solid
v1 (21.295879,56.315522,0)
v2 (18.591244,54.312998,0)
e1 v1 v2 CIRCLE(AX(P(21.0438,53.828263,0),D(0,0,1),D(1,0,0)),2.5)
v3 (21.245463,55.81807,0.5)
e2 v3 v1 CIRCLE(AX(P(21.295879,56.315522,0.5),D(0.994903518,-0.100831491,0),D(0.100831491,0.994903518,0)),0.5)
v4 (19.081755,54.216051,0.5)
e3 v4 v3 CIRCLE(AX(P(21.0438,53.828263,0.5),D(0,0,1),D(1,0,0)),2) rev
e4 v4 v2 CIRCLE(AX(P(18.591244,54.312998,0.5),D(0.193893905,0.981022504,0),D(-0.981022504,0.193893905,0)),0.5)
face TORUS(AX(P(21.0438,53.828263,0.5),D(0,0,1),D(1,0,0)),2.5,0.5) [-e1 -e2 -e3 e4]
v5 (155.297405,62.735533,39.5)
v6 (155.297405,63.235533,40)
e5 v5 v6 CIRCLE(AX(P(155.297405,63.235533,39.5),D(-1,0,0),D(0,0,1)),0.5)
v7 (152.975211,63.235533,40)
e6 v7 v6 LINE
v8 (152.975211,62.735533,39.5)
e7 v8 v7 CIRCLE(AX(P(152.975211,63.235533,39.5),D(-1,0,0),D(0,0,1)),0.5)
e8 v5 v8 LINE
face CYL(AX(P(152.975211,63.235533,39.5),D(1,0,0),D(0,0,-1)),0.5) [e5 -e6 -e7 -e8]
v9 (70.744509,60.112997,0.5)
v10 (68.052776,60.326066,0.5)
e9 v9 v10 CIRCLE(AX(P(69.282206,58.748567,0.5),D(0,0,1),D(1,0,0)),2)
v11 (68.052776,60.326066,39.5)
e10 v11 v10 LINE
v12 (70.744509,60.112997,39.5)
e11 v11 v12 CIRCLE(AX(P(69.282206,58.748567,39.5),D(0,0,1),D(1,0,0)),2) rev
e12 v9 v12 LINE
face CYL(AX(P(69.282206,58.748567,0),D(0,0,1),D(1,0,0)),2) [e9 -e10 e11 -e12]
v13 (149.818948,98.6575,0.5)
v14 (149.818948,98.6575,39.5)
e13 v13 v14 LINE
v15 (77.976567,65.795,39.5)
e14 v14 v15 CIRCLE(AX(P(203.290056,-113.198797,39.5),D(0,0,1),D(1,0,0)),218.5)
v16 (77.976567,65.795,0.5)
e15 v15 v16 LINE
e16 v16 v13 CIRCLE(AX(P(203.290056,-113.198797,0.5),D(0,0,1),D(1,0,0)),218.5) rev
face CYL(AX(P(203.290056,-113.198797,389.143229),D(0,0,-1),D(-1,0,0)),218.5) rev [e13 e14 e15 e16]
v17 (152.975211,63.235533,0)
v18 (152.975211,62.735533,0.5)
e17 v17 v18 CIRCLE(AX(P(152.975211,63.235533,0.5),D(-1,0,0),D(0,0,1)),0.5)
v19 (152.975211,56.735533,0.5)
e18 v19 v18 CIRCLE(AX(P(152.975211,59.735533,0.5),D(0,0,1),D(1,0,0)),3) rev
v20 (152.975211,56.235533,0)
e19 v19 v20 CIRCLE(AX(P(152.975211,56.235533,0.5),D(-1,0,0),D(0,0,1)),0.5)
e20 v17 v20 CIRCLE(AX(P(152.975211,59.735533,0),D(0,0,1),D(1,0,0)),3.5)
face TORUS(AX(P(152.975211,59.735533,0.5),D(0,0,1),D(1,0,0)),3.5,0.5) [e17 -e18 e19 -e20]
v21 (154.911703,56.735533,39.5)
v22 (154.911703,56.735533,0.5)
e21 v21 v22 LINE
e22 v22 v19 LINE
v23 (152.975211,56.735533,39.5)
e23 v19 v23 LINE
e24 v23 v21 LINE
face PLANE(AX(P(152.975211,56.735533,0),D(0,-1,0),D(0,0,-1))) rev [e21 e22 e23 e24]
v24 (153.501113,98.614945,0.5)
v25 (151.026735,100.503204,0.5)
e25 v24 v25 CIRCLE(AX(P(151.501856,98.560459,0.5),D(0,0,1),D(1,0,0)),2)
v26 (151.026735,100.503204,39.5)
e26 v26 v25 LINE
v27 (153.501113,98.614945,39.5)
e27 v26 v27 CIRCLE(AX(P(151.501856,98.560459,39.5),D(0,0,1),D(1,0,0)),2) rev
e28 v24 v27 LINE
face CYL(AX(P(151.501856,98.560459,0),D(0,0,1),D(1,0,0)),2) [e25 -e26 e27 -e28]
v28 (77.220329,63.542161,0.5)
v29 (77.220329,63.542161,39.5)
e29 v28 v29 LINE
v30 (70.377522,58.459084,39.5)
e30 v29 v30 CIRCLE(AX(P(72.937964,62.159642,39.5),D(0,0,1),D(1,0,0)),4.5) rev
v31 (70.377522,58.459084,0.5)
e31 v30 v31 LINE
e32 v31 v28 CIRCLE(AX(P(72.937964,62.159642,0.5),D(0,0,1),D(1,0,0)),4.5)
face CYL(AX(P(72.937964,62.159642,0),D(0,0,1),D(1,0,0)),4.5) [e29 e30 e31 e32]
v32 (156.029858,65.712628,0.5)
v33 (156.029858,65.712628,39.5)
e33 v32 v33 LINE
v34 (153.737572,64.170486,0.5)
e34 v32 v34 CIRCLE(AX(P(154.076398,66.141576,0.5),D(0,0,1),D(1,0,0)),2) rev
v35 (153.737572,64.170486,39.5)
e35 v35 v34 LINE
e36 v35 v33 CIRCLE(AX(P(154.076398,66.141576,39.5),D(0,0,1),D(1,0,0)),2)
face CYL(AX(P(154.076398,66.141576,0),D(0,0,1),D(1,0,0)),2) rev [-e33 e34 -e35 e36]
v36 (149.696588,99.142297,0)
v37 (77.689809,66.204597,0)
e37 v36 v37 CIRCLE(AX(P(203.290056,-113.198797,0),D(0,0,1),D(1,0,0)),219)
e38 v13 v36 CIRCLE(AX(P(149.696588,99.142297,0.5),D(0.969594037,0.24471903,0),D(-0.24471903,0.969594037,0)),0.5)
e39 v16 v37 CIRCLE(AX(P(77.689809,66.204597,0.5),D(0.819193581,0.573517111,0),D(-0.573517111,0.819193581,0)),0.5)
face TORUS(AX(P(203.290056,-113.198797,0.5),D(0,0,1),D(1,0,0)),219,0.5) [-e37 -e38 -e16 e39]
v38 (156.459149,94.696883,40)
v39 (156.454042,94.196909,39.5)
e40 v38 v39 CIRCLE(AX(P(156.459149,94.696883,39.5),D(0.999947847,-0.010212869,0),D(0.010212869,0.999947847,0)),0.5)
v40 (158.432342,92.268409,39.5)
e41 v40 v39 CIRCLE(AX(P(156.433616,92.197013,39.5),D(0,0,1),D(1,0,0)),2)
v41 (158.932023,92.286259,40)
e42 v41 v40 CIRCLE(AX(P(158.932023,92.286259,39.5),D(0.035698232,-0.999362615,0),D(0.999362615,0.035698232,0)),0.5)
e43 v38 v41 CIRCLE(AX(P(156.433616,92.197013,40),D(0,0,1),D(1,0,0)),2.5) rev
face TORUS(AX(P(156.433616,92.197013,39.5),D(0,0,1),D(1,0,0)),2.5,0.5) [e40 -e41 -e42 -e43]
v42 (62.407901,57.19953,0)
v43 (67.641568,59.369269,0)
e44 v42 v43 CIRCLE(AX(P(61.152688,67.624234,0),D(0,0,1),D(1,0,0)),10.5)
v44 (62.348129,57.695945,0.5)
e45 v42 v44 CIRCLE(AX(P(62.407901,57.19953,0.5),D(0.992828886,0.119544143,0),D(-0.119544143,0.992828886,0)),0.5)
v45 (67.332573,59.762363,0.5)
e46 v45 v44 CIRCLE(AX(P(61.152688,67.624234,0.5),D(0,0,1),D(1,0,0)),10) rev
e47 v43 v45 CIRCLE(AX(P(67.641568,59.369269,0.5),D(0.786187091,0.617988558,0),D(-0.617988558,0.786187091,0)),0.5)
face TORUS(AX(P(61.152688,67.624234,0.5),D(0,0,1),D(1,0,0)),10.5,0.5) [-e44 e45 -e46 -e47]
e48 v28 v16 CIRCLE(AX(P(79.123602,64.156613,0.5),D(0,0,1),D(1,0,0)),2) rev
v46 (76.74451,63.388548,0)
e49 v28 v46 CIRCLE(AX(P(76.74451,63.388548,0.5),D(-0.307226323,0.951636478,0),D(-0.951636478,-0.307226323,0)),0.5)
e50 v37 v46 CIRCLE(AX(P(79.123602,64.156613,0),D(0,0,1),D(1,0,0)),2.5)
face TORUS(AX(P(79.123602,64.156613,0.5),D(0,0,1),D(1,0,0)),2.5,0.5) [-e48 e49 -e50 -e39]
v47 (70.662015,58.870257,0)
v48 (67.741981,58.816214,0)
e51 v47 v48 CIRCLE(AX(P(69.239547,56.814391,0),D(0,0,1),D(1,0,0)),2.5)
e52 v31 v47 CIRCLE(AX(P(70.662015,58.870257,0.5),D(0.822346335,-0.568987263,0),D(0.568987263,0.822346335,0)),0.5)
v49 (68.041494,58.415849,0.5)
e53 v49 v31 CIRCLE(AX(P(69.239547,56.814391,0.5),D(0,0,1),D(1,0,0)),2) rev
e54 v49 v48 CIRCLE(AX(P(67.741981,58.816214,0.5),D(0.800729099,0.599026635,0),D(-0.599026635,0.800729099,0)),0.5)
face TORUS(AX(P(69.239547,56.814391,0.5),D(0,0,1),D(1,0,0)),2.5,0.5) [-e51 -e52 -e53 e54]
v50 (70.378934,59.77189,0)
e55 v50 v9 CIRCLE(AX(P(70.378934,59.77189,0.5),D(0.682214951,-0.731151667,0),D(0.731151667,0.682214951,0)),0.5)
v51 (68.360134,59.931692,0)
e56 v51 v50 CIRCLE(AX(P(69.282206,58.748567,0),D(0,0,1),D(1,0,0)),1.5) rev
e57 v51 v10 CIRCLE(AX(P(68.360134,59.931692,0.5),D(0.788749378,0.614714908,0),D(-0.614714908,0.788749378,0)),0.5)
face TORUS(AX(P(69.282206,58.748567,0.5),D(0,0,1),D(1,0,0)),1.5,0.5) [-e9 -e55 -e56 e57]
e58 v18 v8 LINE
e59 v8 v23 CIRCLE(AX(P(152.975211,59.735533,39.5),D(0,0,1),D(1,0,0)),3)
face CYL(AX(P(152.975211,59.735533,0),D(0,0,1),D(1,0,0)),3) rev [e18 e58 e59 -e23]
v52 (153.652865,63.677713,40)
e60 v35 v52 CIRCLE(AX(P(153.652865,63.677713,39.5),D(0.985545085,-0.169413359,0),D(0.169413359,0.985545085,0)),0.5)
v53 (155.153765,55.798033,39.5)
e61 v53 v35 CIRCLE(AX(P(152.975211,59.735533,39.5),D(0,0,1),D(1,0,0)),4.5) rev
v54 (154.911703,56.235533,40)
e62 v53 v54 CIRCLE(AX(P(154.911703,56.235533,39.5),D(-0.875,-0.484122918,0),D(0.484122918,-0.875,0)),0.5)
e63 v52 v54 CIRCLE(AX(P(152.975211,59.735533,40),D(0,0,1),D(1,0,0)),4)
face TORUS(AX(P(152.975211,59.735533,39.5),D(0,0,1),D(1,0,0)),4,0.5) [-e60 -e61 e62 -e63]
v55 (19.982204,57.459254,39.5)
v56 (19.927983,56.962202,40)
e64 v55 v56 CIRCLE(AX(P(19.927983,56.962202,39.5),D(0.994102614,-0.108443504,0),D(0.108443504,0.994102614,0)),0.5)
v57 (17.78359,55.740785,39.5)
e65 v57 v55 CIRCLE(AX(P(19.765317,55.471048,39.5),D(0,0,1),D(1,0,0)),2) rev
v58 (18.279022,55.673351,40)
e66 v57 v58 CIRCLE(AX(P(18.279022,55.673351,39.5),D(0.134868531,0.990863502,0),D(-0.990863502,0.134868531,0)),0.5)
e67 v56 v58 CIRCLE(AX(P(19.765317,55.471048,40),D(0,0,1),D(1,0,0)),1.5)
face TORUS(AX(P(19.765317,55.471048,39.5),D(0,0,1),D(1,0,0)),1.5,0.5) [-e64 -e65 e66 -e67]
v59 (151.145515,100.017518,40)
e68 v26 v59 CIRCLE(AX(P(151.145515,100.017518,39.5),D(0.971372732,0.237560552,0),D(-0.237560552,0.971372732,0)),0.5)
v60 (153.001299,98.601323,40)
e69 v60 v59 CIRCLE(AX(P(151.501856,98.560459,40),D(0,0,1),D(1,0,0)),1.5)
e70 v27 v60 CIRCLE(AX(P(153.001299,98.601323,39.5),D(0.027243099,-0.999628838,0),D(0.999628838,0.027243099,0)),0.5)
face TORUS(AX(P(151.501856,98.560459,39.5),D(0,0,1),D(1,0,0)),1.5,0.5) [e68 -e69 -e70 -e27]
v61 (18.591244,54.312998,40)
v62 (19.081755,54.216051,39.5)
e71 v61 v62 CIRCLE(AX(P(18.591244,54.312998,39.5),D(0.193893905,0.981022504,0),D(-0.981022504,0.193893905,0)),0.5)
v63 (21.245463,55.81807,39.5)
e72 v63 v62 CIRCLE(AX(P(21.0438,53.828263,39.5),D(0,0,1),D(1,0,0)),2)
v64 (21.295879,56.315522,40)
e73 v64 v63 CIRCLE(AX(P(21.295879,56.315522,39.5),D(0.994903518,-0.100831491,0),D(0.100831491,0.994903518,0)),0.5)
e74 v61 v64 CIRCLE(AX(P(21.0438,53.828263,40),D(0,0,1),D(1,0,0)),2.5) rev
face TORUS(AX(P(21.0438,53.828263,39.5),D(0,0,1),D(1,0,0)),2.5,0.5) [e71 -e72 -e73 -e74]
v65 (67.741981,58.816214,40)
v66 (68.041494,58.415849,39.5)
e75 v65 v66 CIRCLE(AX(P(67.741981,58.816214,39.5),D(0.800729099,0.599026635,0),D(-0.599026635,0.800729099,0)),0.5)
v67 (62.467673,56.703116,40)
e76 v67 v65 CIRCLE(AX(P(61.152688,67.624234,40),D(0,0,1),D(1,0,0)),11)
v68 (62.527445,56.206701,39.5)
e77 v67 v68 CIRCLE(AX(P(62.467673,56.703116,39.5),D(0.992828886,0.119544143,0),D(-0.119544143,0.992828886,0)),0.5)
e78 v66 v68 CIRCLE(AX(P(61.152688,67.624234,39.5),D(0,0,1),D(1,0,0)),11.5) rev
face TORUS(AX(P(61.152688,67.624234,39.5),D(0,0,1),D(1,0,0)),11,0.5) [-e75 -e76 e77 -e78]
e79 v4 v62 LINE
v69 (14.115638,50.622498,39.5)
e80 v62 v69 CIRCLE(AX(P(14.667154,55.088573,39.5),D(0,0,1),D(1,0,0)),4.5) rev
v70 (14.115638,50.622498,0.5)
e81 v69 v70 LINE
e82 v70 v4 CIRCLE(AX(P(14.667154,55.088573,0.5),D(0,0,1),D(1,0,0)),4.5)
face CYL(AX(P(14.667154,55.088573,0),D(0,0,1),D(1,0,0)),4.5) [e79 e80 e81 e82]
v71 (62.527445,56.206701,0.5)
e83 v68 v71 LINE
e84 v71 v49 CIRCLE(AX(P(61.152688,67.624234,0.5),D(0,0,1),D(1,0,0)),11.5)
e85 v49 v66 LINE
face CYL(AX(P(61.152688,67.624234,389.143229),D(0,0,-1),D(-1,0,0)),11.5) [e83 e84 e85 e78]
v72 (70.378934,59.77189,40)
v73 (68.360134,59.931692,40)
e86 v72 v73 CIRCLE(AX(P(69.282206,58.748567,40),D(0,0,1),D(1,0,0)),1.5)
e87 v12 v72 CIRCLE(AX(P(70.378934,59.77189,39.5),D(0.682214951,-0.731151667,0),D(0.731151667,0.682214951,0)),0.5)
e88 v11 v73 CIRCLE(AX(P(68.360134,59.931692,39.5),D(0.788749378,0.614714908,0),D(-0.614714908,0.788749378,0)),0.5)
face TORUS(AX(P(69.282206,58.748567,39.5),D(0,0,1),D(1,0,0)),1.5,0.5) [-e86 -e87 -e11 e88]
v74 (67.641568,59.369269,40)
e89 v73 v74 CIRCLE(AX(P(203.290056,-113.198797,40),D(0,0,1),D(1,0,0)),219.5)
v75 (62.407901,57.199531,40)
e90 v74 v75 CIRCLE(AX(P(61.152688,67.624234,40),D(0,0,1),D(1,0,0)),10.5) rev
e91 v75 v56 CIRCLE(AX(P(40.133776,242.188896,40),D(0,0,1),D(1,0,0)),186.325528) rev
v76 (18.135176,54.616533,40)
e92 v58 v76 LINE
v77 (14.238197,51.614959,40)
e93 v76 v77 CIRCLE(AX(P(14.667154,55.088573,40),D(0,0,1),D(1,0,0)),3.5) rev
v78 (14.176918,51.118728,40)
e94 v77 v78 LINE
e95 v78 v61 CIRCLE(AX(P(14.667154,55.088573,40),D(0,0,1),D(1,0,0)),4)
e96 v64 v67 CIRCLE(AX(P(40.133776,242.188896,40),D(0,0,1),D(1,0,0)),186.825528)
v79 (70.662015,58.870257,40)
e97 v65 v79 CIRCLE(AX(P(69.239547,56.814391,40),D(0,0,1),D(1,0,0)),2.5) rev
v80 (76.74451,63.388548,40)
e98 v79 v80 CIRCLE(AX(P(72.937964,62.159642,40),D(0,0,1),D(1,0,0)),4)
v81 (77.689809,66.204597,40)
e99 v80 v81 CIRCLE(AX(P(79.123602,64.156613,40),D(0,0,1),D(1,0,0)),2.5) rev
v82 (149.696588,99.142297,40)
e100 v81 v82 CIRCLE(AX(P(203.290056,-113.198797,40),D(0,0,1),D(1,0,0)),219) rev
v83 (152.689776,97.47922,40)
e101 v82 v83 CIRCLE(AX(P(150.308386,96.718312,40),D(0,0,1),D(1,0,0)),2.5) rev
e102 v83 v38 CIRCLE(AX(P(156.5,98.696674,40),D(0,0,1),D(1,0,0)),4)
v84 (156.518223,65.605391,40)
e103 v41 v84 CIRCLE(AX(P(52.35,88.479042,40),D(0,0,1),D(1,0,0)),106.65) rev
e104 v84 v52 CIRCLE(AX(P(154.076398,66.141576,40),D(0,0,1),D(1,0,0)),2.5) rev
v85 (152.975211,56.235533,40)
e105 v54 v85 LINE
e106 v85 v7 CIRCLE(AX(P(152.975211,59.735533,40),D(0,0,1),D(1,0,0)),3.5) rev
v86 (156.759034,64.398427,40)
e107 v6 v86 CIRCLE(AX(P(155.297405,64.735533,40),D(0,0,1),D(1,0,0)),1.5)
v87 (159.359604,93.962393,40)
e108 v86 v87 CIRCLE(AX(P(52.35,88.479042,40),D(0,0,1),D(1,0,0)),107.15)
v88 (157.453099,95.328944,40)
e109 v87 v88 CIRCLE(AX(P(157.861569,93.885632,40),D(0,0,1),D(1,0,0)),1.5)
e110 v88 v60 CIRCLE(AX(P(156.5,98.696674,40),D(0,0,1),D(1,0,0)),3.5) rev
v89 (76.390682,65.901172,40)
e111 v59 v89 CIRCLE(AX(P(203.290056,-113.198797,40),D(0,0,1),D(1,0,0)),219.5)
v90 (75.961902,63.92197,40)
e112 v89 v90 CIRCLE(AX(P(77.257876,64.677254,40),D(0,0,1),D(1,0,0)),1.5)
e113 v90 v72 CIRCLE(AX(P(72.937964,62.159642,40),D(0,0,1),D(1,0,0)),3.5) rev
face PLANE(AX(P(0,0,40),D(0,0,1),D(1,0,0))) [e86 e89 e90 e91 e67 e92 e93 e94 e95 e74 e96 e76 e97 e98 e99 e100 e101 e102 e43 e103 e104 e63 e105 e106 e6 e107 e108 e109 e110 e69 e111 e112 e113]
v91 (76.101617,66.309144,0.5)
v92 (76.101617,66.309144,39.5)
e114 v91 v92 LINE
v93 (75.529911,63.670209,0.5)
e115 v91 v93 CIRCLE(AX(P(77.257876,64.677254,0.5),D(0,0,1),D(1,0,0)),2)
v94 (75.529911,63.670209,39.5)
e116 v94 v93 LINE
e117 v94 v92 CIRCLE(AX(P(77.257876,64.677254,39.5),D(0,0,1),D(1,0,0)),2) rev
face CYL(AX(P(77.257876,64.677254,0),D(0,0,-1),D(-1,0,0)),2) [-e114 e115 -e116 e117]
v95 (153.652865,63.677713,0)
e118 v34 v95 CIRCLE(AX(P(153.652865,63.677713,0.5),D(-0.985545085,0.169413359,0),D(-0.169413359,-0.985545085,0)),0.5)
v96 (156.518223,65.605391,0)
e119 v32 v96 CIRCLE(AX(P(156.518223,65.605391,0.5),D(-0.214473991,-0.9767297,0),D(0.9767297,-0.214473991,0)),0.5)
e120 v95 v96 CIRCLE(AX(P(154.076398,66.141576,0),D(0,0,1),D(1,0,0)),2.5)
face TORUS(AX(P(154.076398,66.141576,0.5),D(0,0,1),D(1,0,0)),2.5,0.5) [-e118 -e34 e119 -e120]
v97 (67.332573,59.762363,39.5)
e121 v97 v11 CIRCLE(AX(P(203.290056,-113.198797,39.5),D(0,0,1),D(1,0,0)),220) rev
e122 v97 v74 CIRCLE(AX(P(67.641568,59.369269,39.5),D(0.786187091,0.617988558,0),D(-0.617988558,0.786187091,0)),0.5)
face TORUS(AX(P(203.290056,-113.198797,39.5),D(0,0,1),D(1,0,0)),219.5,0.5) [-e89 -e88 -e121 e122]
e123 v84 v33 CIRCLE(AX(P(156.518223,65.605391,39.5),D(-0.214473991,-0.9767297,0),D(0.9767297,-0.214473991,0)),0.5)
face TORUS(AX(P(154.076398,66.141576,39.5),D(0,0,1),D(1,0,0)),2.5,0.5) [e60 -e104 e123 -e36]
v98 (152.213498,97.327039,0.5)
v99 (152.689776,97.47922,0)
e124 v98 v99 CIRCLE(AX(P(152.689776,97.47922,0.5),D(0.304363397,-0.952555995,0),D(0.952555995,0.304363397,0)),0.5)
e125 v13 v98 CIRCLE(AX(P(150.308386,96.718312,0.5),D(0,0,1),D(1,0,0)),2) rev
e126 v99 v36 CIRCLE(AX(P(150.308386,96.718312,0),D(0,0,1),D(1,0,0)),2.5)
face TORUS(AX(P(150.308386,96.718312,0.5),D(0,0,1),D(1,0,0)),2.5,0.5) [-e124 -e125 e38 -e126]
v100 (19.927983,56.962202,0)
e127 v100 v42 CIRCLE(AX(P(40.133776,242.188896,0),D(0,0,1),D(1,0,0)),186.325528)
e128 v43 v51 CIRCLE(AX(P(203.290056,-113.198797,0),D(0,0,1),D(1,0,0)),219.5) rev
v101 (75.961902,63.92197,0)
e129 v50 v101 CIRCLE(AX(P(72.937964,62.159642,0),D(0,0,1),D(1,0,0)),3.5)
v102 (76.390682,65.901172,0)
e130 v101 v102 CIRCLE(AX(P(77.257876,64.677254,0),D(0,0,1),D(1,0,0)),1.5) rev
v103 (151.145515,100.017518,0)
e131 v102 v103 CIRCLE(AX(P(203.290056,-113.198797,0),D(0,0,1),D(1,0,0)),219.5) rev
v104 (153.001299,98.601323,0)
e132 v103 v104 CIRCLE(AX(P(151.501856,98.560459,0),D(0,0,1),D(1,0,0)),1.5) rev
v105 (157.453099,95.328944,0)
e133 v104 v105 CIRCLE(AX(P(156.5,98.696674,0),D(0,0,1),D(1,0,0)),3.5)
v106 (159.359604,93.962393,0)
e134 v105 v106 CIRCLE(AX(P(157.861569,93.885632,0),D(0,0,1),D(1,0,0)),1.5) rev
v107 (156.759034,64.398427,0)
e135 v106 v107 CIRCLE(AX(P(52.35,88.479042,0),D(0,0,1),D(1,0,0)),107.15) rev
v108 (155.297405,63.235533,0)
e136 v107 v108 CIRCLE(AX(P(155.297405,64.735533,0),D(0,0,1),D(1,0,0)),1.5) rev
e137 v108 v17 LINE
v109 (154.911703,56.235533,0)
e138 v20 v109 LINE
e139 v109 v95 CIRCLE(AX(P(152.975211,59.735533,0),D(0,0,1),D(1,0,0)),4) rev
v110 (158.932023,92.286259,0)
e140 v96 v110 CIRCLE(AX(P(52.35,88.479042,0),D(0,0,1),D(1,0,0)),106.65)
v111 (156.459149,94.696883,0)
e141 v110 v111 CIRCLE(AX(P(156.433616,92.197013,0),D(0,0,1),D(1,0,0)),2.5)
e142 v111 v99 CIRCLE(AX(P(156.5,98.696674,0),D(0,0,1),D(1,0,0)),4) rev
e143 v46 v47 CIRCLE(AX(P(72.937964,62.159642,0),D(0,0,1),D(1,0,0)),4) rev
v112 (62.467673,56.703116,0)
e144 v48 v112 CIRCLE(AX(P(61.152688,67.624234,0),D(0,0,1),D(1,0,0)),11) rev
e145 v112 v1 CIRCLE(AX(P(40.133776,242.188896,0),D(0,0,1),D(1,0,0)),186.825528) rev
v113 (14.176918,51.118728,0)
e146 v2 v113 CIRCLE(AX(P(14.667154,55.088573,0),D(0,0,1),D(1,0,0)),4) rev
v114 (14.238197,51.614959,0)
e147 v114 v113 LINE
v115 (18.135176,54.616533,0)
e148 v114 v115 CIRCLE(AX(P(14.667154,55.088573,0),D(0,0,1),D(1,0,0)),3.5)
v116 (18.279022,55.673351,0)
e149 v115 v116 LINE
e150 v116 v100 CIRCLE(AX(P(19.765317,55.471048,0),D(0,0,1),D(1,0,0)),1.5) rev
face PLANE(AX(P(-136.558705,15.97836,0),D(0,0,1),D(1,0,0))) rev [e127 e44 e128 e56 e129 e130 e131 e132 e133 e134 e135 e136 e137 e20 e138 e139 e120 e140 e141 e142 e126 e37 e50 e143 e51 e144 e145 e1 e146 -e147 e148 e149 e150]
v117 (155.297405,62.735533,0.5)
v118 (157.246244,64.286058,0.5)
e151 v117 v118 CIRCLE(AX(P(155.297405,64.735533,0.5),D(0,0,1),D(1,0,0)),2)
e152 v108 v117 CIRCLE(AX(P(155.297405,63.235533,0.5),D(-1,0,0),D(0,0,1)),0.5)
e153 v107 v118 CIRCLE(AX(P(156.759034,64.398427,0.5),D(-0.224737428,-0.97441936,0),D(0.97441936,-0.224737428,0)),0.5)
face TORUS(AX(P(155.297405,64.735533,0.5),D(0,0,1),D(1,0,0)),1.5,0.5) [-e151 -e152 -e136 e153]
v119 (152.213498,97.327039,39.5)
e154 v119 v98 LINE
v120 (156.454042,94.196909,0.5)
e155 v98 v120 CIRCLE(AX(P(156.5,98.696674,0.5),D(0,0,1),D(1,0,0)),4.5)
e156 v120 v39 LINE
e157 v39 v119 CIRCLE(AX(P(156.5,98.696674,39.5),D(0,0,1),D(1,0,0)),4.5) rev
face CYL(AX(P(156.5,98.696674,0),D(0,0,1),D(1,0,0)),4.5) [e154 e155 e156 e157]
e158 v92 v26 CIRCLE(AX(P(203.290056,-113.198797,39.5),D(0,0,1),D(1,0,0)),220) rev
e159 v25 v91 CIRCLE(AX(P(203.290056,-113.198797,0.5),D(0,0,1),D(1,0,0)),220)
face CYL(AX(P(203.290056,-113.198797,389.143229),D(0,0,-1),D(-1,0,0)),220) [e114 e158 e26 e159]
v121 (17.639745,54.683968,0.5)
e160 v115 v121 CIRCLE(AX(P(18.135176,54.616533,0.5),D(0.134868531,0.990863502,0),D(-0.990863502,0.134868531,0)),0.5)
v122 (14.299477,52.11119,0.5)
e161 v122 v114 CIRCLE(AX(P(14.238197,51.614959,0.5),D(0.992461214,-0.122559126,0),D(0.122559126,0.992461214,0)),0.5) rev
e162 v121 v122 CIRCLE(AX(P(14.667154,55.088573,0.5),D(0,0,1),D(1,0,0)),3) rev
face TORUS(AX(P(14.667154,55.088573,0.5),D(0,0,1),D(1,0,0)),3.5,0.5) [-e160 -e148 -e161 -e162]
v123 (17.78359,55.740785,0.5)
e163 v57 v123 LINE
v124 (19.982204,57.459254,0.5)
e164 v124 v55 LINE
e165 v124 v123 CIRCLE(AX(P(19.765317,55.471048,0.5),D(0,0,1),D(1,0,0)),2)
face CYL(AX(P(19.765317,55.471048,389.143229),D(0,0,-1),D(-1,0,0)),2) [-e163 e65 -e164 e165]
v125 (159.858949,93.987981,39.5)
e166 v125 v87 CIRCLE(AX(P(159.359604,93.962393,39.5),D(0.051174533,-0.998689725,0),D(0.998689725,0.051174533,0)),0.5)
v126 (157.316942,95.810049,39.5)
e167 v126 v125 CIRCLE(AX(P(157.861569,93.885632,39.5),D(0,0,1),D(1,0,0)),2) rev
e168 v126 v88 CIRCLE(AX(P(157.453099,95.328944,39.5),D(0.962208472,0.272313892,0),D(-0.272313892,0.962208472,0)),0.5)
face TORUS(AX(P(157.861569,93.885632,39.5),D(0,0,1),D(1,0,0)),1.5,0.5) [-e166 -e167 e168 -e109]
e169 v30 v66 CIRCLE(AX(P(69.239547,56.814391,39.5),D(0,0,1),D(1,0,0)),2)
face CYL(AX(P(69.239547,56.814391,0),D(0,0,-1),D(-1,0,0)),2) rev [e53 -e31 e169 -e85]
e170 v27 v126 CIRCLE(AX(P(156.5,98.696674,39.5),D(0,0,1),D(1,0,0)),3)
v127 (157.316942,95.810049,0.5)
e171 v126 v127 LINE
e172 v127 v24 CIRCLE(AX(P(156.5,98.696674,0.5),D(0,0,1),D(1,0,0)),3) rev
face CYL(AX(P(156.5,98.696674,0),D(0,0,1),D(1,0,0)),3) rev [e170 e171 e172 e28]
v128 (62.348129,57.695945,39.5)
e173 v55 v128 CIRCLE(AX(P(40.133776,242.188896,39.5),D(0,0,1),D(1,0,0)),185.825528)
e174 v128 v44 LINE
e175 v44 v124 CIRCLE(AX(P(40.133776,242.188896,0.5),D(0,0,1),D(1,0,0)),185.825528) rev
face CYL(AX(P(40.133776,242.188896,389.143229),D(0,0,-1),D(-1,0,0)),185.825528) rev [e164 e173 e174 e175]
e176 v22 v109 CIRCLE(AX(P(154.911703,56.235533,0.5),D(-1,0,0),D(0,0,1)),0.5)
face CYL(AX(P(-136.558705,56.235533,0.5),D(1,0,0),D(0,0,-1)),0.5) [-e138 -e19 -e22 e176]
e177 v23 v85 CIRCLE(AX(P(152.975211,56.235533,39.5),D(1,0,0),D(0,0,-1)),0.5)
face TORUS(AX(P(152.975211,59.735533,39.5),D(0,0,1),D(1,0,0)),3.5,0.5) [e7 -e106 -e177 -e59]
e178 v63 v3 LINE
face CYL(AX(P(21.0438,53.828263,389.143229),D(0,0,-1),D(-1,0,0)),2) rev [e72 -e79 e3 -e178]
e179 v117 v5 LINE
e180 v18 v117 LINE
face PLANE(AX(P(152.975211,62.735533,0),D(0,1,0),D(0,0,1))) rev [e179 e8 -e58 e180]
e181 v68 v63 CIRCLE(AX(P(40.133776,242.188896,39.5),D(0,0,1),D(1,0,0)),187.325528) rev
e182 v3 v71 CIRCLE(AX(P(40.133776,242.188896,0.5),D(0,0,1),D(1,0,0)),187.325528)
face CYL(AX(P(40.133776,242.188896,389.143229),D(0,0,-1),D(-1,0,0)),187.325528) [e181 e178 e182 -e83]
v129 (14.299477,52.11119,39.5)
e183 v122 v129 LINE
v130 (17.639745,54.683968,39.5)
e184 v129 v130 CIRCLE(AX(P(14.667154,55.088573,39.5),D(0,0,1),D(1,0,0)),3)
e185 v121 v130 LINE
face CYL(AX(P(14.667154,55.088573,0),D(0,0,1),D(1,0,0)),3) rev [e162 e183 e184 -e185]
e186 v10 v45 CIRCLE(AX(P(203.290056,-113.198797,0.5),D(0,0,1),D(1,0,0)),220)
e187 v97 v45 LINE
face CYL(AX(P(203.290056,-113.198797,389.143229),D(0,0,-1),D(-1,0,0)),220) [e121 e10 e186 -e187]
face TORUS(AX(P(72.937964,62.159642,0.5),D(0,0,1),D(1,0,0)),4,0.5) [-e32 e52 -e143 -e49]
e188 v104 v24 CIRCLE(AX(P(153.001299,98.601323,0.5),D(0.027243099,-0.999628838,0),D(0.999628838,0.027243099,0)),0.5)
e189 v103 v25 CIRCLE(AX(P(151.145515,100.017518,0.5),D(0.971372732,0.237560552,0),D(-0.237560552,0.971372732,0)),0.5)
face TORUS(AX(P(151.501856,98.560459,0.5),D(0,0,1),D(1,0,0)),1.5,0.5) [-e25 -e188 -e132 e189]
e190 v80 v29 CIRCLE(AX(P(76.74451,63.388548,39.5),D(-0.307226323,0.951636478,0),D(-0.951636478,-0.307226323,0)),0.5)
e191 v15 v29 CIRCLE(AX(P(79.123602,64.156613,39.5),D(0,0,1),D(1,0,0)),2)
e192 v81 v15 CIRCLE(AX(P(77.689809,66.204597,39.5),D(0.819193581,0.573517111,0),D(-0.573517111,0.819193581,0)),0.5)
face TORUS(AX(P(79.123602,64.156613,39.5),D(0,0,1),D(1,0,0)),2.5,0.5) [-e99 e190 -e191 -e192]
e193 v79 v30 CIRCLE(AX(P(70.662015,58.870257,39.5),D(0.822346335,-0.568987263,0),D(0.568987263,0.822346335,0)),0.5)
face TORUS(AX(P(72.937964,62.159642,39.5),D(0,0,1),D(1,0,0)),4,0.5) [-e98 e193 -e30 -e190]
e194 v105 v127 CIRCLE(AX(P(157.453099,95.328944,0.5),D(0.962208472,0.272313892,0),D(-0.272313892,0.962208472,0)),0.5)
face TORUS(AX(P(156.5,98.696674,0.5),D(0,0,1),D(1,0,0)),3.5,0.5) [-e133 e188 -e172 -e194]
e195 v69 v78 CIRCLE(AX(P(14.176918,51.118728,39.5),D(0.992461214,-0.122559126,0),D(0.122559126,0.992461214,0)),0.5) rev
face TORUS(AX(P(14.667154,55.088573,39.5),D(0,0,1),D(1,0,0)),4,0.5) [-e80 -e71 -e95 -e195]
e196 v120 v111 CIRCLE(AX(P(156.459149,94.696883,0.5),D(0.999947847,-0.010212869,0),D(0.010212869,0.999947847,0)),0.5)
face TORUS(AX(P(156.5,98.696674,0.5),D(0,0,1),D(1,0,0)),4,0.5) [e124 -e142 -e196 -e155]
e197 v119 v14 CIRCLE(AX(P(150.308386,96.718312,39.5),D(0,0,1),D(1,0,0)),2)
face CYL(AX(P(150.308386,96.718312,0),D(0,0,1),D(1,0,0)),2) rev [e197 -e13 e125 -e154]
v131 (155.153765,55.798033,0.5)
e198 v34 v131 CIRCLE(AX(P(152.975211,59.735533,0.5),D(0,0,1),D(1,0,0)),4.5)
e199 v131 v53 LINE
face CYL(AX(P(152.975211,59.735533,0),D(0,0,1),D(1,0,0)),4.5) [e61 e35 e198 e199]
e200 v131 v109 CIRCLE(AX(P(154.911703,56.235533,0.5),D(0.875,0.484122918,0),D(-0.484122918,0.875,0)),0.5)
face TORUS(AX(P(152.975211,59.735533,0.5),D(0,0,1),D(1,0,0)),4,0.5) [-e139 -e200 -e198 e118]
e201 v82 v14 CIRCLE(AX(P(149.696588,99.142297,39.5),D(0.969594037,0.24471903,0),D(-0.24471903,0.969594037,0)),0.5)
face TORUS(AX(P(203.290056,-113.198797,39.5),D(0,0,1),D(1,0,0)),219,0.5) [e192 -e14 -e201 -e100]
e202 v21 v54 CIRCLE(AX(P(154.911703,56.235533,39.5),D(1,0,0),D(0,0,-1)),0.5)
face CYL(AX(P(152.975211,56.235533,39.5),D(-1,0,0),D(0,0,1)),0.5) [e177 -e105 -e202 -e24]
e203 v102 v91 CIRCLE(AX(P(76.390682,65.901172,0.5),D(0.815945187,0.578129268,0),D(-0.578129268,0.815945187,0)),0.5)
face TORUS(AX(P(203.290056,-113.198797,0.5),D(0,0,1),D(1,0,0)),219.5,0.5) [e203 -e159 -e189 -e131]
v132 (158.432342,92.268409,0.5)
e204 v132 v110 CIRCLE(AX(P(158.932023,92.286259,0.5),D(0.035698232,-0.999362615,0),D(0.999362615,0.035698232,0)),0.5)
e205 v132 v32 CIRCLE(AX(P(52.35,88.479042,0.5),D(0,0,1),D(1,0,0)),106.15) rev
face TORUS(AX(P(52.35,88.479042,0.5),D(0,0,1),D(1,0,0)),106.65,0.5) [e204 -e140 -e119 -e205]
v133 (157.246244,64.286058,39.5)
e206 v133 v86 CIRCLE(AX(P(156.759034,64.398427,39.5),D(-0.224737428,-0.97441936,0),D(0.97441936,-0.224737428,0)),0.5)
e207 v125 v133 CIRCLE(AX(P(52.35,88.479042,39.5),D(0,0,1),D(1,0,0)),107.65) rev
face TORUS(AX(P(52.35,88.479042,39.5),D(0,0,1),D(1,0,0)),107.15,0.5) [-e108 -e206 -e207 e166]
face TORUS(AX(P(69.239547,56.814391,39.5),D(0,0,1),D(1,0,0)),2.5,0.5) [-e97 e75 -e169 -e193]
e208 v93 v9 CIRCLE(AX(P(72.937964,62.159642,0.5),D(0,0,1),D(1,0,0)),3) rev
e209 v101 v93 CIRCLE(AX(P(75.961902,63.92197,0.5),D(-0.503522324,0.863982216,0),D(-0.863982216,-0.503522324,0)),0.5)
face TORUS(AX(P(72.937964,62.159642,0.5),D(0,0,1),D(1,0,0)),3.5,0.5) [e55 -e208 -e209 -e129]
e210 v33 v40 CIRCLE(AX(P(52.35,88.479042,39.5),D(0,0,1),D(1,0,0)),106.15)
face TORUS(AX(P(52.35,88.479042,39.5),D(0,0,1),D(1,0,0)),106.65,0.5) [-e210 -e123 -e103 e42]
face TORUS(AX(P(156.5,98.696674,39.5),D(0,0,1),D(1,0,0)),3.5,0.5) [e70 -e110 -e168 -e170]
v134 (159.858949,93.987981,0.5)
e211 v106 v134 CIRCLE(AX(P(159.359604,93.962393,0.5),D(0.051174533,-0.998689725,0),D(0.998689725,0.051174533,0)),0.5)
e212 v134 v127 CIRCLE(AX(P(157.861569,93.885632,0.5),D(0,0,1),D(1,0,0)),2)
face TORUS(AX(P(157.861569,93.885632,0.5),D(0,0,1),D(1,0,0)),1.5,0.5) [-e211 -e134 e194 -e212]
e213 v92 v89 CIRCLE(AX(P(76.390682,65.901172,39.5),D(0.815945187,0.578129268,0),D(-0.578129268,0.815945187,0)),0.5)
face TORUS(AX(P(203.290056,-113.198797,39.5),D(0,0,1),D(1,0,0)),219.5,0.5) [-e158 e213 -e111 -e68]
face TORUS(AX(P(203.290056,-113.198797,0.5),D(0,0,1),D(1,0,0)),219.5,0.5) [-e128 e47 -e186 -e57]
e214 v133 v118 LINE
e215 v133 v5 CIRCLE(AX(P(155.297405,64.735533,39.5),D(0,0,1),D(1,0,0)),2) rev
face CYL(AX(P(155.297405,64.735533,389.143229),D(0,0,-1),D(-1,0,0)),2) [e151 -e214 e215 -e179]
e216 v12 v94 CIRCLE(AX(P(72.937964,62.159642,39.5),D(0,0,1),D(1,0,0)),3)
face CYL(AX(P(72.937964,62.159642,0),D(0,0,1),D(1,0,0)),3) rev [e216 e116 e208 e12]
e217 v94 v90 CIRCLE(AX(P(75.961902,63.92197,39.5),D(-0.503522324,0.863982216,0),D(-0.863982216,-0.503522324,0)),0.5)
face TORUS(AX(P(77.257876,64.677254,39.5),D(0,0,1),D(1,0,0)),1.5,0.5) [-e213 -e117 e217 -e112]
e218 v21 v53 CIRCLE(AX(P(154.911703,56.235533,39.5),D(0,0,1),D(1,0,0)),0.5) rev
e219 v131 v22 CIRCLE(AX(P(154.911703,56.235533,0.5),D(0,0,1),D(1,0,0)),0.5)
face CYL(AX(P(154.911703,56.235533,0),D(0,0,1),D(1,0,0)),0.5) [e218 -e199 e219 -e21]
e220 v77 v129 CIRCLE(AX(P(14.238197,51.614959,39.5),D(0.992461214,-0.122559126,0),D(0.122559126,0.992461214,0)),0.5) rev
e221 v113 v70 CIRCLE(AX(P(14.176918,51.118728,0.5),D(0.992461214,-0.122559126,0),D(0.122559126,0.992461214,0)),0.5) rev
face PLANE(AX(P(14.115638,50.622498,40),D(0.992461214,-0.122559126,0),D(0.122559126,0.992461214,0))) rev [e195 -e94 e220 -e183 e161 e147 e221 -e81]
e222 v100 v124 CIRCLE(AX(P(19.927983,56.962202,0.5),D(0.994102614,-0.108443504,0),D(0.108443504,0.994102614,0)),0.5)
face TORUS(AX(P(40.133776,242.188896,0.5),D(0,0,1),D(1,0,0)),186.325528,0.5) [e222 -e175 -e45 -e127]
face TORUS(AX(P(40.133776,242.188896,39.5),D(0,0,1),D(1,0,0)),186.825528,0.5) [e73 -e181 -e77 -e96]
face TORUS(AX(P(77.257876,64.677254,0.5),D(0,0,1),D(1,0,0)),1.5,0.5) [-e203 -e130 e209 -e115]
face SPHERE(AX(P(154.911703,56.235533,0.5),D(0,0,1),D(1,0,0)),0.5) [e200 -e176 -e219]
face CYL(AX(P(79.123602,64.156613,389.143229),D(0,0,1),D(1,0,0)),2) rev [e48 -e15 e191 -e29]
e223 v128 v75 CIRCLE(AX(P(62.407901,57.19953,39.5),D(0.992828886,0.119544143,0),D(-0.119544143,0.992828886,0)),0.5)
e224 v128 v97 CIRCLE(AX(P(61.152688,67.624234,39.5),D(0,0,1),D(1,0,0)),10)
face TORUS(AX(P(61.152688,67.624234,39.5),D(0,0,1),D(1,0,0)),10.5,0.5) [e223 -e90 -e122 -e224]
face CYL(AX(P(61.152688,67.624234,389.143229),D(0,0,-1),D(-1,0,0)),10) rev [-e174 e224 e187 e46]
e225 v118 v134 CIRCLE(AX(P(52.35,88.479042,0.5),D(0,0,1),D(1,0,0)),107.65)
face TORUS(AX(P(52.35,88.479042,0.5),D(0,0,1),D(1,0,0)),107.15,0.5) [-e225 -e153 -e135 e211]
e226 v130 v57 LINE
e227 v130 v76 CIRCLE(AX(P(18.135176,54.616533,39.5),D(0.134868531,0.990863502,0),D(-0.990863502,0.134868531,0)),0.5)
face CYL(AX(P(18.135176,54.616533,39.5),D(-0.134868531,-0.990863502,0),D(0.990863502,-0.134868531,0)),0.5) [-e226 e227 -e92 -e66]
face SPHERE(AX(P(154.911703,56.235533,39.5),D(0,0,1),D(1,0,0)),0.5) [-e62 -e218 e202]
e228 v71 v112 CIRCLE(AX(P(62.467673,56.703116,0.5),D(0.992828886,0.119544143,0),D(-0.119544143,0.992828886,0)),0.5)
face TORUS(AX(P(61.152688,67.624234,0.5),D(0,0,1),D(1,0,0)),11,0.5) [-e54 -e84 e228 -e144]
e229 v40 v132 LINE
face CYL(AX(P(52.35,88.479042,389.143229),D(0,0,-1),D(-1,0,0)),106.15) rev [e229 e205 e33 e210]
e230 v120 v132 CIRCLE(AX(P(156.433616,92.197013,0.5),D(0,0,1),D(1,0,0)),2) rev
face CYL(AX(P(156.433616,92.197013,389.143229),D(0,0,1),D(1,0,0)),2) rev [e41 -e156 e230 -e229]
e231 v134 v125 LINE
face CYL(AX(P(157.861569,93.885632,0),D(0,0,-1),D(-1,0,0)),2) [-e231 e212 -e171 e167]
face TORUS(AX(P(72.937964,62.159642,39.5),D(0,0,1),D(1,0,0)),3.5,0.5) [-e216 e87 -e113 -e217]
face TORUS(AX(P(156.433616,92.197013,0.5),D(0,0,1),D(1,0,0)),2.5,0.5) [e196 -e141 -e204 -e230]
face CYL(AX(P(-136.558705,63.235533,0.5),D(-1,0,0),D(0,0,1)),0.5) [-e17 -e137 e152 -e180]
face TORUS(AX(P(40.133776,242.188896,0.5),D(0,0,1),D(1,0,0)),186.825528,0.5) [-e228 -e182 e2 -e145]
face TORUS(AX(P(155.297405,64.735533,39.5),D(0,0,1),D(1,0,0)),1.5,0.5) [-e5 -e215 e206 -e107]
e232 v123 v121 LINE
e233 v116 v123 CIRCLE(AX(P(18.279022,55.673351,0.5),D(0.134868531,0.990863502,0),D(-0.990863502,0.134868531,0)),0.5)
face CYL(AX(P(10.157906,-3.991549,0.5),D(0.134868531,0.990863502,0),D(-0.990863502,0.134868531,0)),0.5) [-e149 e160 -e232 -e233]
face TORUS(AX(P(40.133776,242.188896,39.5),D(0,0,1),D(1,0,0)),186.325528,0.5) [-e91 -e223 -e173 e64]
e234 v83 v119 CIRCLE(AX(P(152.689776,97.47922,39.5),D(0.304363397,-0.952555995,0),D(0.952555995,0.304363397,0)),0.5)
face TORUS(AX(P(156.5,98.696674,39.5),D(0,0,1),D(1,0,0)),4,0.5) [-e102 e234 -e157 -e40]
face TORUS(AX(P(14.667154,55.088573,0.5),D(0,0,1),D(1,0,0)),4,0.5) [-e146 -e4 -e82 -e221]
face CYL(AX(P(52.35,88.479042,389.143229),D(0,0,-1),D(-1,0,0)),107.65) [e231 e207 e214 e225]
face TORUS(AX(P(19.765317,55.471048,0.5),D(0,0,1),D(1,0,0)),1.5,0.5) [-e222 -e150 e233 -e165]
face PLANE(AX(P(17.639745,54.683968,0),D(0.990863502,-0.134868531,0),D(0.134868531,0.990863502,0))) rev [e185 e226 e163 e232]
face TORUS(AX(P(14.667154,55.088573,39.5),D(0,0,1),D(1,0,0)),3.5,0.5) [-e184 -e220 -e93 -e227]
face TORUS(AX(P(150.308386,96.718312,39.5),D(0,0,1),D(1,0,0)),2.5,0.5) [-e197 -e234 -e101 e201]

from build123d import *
from build123d.topology import SkipClean

# Parameters (mm, degrees)
EXTRUDE_1_DEPTH     = 40
SKETCH_2_R          = 3
EXTRUDE_1_2_DEPTH   = 40
EXTRUDE_2_DEPTH     = 40
CUT_EXTRUDE_2_DEPTH = 208.592060428
FILLET_1_R          = 2
FILLET_3_R          = 0.5
FILLET_4_R          = 0.5
CUT_EXTRUDE_3_DEPTH = 207.611727306


with BuildPart() as part:
    # ｽｹｯﾁ1 → Extrude 1 (new body)
    with BuildSketch(Plane.XY):
        with BuildLine():
            ThreePointArc((-174.917675812, 6.802025891), (-175.16536545, 24.049389715), (-168.029000204, 39.753058081))
            ThreePointArc((-168.029000204, 39.753058081), (-164.386404751, 43.234236237), (-159.829079223, 45.38316318))
            ThreePointArc((-159.829079223, 45.38316318), (-73.039152779, 60.834071576), (15.071759596, 58.061162838))
            ThreePointArc((15.071759596, 58.061162838), (38.698282136, 56.368912879), (62.348129133, 57.695945012))
            ThreePointArc((62.348129133, 57.695945012), (64.982359088, 58.386614212), (67.332573283, 59.762362967))
            ThreePointArc((67.332573283, 59.762362967), (68.437320119, 60.625078199), (69.547541148, 61.480737248))
            ThreePointArc((69.547541148, 61.480737248), (69.829795591, 61.819116287), (69.939206591, 62.245961901))
            ThreePointArc((69.939206591, 62.245961901), (71.148233251, 64.567309568), (73.719523874, 65.056047728))
            ThreePointArc((73.719523874, 65.056047728), (74.15979094, 65.03780341), (74.565156848, 65.21056459))
            ThreePointArc((74.565156848, 65.21056459), (113.346908434, 87.575280448), (155.853132865, 101.626104486))
            ThreePointArc((155.853132865, 101.626104486), (158.26218824, 101.124572816), (159.485666507, 98.989582711))
            ThreePointArc((159.485666507, 98.989582711), (159.562144442, 78.779630656), (155.859832877, 58.911543179))
            Line((155.859832877, 58.911543179), (154.417522154, 59.323538057))
            ThreePointArc((154.417522154, 59.323538057), (158.068245541, 78.914782698), (157.992833254, 98.843128361))
            ThreePointArc((157.992833254, 98.843128361), (157.38109412, 99.910623413), (156.176566433, 100.161389249))
            ThreePointArc((156.176566433, 100.161389249), (113.960157168, 86.206366284), (75.442826616, 63.994137124))
            ThreePointArc((75.442826616, 63.994137124), (74.429411845, 63.562234175), (73.32874418, 63.607844969))
            ThreePointArc((73.32874418, 63.607844969), (72.043098868, 63.363475889), (71.438585538, 62.202802056))
            ThreePointArc((71.438585538, 62.202802056), (71.165058039, 61.135688021), (70.459421932, 60.289740423))
            ThreePointArc((70.459421932, 60.289740423), (69.356770591, 59.439915413), (68.259556121, 58.583082331))
            ThreePointArc((68.259556121, 58.583082331), (65.556810089, 57.000971383), (62.527445976, 56.206701758))
            ThreePointArc((62.527445976, 56.206701758), (38.68669584, 54.868957627), (14.869458419, 56.574867365))
            ThreePointArc((14.869458419, 56.574867365), (-72.930878607, 59.337984435), (-159.414875998, 43.941485058))
            ThreePointArc((-159.414875998, 43.941485058), (-163.537227688, 41.997749947), (-166.832146939, 38.848877645))
            ThreePointArc((-166.832146939, 38.848877645), (-173.697107608, 23.742438725), (-173.458837906, 7.151012945))
            Line((-173.458837906, 7.151012945), (-174.917675812, 6.802025891))
        make_face()
    extrude(amount=EXTRUDE_1_DEPTH)

    # ｽｹｯﾁ2 → Extrude 1 2 (add, through all)
    with BuildSketch(Plane.XY):
        with Locations((156.5, 98.696674011)):
            Circle(SKETCH_2_R)
        with Locations((152.975211431, 59.735532934)):
            Circle(SKETCH_2_R)
        with Locations((72.937964485, 62.15964221)):
            Circle(SKETCH_2_R)
        with Locations((14.667154113, 55.08857315)):
            Circle(SKETCH_2_R)
        with Locations((-95.332845887, 55.602740192)):
            Circle(SKETCH_2_R)
        with Locations((-159, 42.5)):
            Circle(SKETCH_2_R)
        with Locations((-172, 7.5)):
            Circle(SKETCH_2_R)
    extrude(amount=EXTRUDE_1_2_DEPTH)

    # ｽｹｯﾁ3 → ﾎﾞｽ - 押し出し2 (add, through all)
    with SkipClean():  # the faces are left unmerged after this step: merging them gives an invalid solid
        with BuildSketch(Plane.XY.offset(40)):
            with BuildLine():
                ThreePointArc((155.105149564, 61.848200335), (155.309814131, 62.650779102), (155.508210181, 63.454930376))
                ThreePointArc((155.508210181, 63.454930376), (148.997241196, 57.631785608), (157.475211431, 59.735532934))
                ThreePointArc((157.475211431, 59.735532934), (157.288117426, 61.019605313), (156.742392819, 62.196903362))
                ThreePointArc((156.742392819, 62.196903362), (156.314091206, 60.550736841), (155.859832877, 58.911543179))
                ThreePointArc((155.859832877, 58.911543179), (150.069623581, 58.988834035), (155.105149564, 61.848200335))
            make_face()
            with BuildLine():
                ThreePointArc((156.742392819, 62.196903362), (156.187488729, 62.886925414), (155.508210181, 63.454930376))
                ThreePointArc((155.508210181, 63.454930376), (155.309814131, 62.650779102), (155.105149564, 61.848200335))
                ThreePointArc((155.105149564, 61.848200335), (150.069623581, 58.988834035), (155.859832877, 58.911543179))
                ThreePointArc((155.859832877, 58.911543179), (156.314091206, 60.550736841), (156.742392819, 62.196903362))
            make_face()
            with BuildLine():
                ThreePointArc((153.634250899, 99.584075889), (152.831051821, 99.395038452), (152.028572351, 99.202969162))
                ThreePointArc((152.028572351, 99.202969162), (153.837741702, 95.068674458), (158.324352301, 94.583069912))
                ThreePointArc((158.324352301, 94.583069912), (158.27349835, 95.409770667), (158.216195446, 96.236049458))
                ThreePointArc((158.216195446, 96.236049458), (154.730059706, 96.274420648), (153.634250899, 99.584075889))
            make_face()
            with BuildLine():
                ThreePointArc((70.459421932, 60.289740423), (69.906180844, 59.864751513), (69.354299522, 59.437998327))
                ThreePointArc((69.354299522, 59.437998327), (74.373845341, 57.894874202), (77.437964485, 62.15964221))
                ThreePointArc((77.437964485, 62.15964221), (77.217292333, 63.55153056), (76.576918629, 64.806907354))
                ThreePointArc((76.576918629, 64.806907354), (76.009223863, 64.40142748), (75.442826616, 63.994137124))
                ThreePointArc((75.442826616, 63.994137124), (75.399998918, 63.963913966), (75.356546973, 63.934595379))
                ThreePointArc((75.356546973, 63.934595379), (74.72769572, 59.751974852), (70.541302553, 60.35520003))
                ThreePointArc((70.541302553, 60.35520003), (70.500705388, 60.322041001), (70.459421932, 60.289740423))
            make_face()
            with BuildLine():
                ThreePointArc((12.289483713, 56.91796744), (11.472492469, 57.023256633), (10.655298124, 57.126957688))
                ThreePointArc((10.655298124, 57.126957688), (13.619144559, 50.712310364), (19.167154113, 55.08857315))
                ThreePointArc((19.167154113, 55.08857315), (19.140980955, 55.573210523), (19.062765943, 56.052210345))
                ThreePointArc((19.062765943, 56.052210345), (18.249123765, 56.1461181), (17.435899956, 56.243582438))
                ThreePointArc((17.435899956, 56.243582438), (14.277367269, 52.114003228), (12.289483713, 56.91796744))
            make_face()
            with BuildLine():
                ThreePointArc((-98.102305571, 56.756036796), (-98.918773563, 56.646764089), (-99.735027626, 56.535904666))
                ThreePointArc((-99.735027626, 56.535904666), (-95.801984552, 51.127261568), (-90.832845887, 55.602740192))
                ThreePointArc((-90.832845887, 55.602740192), (-90.951732307, 56.630282793), (-91.302109797, 57.603531678))
                ThreePointArc((-91.302109797, 57.603531678), (-92.120237861, 57.507474522), (-92.938177679, 57.409827398))
                ThreePointArc((-92.938177679, 57.409827398), (-94.956046603, 52.626497208), (-98.102305571, 56.756036796))
            make_face()
            with BuildLine():
                ThreePointArc((-161.968675598, 42.932394718), (-162.736296322, 42.509116787), (-163.47635635, 42.039311575))
                ThreePointArc((-163.47635635, 42.039311575), (-158.769352625, 38.0059148), (-154.5, 42.5))
                ThreePointArc((-154.5, 42.5), (-154.710957632, 43.861659124), (-155.324051364, 45.095650521))
                ThreePointArc((-155.324051364, 45.095650521), (-156.117747866, 44.875181143), (-156.911014356, 44.653169519))
                ThreePointArc((-156.911014356, 44.653169519), (-158.033702901, 39.659882059), (-161.968675598, 42.932394718))
            make_face()
            with BuildLine():
                ThreePointArc((-175.578603832, 10.228295184), (-173.439840747, 3.236567272), (-167.5, 7.5))
                ThreePointArc((-167.5, 7.5), (-169.737135307, 11.389658518), (-174.224197059, 11.411898189))
                ThreePointArc((-174.224197059, 11.411898189), (-174.113884067, 10.579249836), (-173.985166515, 9.74924741))
                ThreePointArc((-173.985166515, 9.74924741), (-169.139756236, 6.595010712), (-174.917675812, 6.802025891))
                ThreePointArc((-174.917675812, 6.802025891), (-175.286049309, 8.50784779), (-175.578603832, 10.228295184))
            make_face()
            with BuildLine():
                ThreePointArc((-173.985166515, 9.74924741), (-174.113884067, 10.579249836), (-174.224197059, 11.411898189))
                ThreePointArc((-174.224197059, 11.411898189), (-174.961140585, 10.888457825), (-175.578603832, 10.228295184))
                ThreePointArc((-175.578603832, 10.228295184), (-175.286049309, 8.50784779), (-174.917675812, 6.802025891))
                ThreePointArc((-174.917675812, 6.802025891), (-169.139756236, 6.595010712), (-173.985166515, 9.74924741))
            make_face()
            with BuildLine():
                ThreePointArc((-174.917675812, 6.802025891), (-169.139756236, 6.595010712), (-173.985166515, 9.74924741))
                ThreePointArc((-173.985166515, 9.74924741), (-173.403193785, 25.035153743), (-166.832146939, 38.848877645))
                ThreePointArc((-166.832146939, 38.848877645), (-164.631459446, 41.165814703), (-161.968675598, 42.932394718))
                ThreePointArc((-161.968675598, 42.932394718), (-158.033702901, 39.659882059), (-156.911014356, 44.653169519))
                ThreePointArc((-156.911014356, 44.653169519), (-127.721253028, 51.747326401), (-98.102305571, 56.756036796))
                ThreePointArc((-98.102305571, 56.756036796), (-94.956046603, 52.626497208), (-92.938177679, 57.409827398))
                ThreePointArc((-92.938177679, 57.409827398), (-40.309022297, 60.442434008), (12.289483713, 56.91796744))
                ThreePointArc((12.289483713, 56.91796744), (14.277367269, 52.114003228), (17.435899956, 56.243582438))
                ThreePointArc((17.435899956, 56.243582438), (39.98055891, 54.863431307), (62.527445397, 56.206701272))
                ThreePointArc((62.527445397, 56.206701272), (65.556809954, 57.000970881), (68.259556248, 58.583082168))
                ThreePointArc((68.259556248, 58.583082168), (69.356770591, 59.439915413), (70.459421932, 60.289740423))
                ThreePointArc((70.459421932, 60.289740423), (70.500705388, 60.322041001), (70.541302553, 60.35520003))
                ThreePointArc((70.541302553, 60.35520003), (74.72769572, 59.751974852), (75.356546973, 63.934595379))
                ThreePointArc((75.356546973, 63.934595379), (75.399998918, 63.963913966), (75.442826616, 63.994137124))
                ThreePointArc((75.442826616, 63.994137124), (112.772142039, 85.669896417), (153.634250899, 99.584075889))
                ThreePointArc((153.634250899, 99.584075889), (154.730059706, 96.274420648), (158.216195446, 96.236049458))
                ThreePointArc((158.216195446, 96.236049458), (158.068245541, 78.914782698), (155.105149564, 61.848200335))
                ThreePointArc((155.105149564, 61.848200335), (150.069623581, 58.988834035), (155.859832877, 58.911543179))
                ThreePointArc((155.859832877, 58.911543179), (159.562144442, 78.779630656), (159.485666507, 98.989582711))
                ThreePointArc((159.485666507, 98.989582711), (158.26218824, 101.124572816), (155.853132865, 101.626104486))
                ThreePointArc((155.853132865, 101.626104486), (113.346908434, 87.575280448), (74.565156848, 65.21056459))
                ThreePointArc((74.565156848, 65.21056459), (74.15979094, 65.03780341), (73.719523874, 65.056047728))
                ThreePointArc((73.719523874, 65.056047728), (71.148233251, 64.567309568), (69.939206591, 62.245961901))
                ThreePointArc((69.939206591, 62.245961901), (69.829795591, 61.819116287), (69.547541148, 61.480737248))
                ThreePointArc((69.547541148, 61.480737248), (68.437320119, 60.625078199), (67.332573283, 59.762362967))
                ThreePointArc((67.332573283, 59.762362967), (64.982359088, 58.386614212), (62.348129133, 57.695945012))
                ThreePointArc((62.348129133, 57.695945012), (38.698282167, 56.368913497), (15.07175968, 58.061163451))
                ThreePointArc((15.07175968, 58.061163451), (-73.039152866, 60.83407219), (-159.829079451, 45.383163973))
                ThreePointArc((-159.829079451, 45.383163973), (-164.386405219, 43.234236917), (-168.029000204, 39.753058081))
                ThreePointArc((-168.029000204, 39.753058081), (-175.16536545, 24.049389715), (-174.917675812, 6.802025891))
            make_face()
        extrude(amount=-EXTRUDE_2_DEPTH)
    add(part.part.scale(1), mode=Mode.REPLACE)  # the faces are merged on a copy

    # ｽｹｯﾁ4 → ｶｯﾄ - 押し出し2 (cut, through all)
    with BuildSketch(Plane.XY.offset(40)):
        with BuildLine():
            Line((-161.881126724, 41.663872737), (-162.717256801, 44.545009155))
            ThreePointArc((-162.717256801, 44.545009155), (-160.67225734, 48.262263142), (-156.955003353, 46.217263682))
            Line((-156.955003353, 46.217263682), (-156.118873276, 43.336127263))
            ThreePointArc((-156.118873276, 43.336127263), (-158.163872737, 39.618873276), (-161.881126724, 41.663872737))
        make_face()
        with BuildLine():
            Line((-172, 4.5), (-176.5, 4.5))
            ThreePointArc((-176.5, 4.5), (-179.5, 7.5), (-176.5, 10.5))
            Line((-176.5, 10.5), (-172, 10.5))
            ThreePointArc((-172, 10.5), (-169, 7.5), (-172, 4.5))
        make_face()
        with BuildLine():
            Line((-98.309088871, 55.225940908), (-98.685888052, 58.202183073))
            ThreePointArc((-98.685888052, 58.202183073), (-96.086444352, 61.555225341), (-92.733402084, 58.955781642))
            Line((-92.733402084, 58.955781642), (-92.356602903, 55.979539476))
            ThreePointArc((-92.356602903, 55.979539476), (-94.956046603, 52.626497208), (-98.309088871, 55.225940908))
        make_face()
        with BuildLine():
            Line((11.694563608, 55.493178744), (12.099169116, 58.465768619))
            ThreePointArc((12.099169116, 58.465768619), (15.476365216, 61.03375353), (18.044350127, 57.65655743))
            Line((18.044350127, 57.65655743), (17.639744618, 54.683967555))
            ThreePointArc((17.639744618, 54.683967555), (14.262548518, 52.115982644), (11.694563608, 55.493178744))
        make_face()
        with BuildLine():
            Line((70.530297127, 60.369910976), (68.740565893, 62.777578334))
            ThreePointArc((68.740565893, 62.777578334), (69.358502016, 66.974976927), (73.555900609, 66.357040803))
            Line((73.555900609, 66.357040803), (75.345631843, 63.949373445))
            ThreePointArc((75.345631843, 63.949373445), (74.72769572, 59.751974852), (70.530297127, 60.369910976))
        make_face()
        with BuildLine():
            Line((154.072101195, 100.458862251), (155.834289436, 102.886761056))
            ThreePointArc((155.834289436, 102.886761056), (160.024376481, 103.55247162), (160.690087045, 99.362384575))
            Line((160.690087045, 99.362384575), (158.927898805, 96.934485771))
            ThreePointArc((158.927898805, 96.934485771), (154.73781176, 96.268775206), (154.072101195, 100.458862251))
        make_face()
        with BuildLine():
            Line((152.975211431, 62.735532934), (157.475211431, 62.735532934))
            ThreePointArc((157.475211431, 62.735532934), (160.475211431, 59.735532934), (157.475211431, 56.735532934))
            Line((157.475211431, 56.735532934), (152.975211431, 56.735532934))
            ThreePointArc((152.975211431, 56.735532934), (149.975211431, 59.735532934), (152.975211431, 62.735532934))
        make_face()
    extrude(amount=-CUT_EXTRUDE_2_DEPTH, mode=Mode.SUBTRACT)

    # ﾌｨﾚｯﾄ1
    fillet_1_edges = [part.edges().sort_by_distance(p)[0] for p in [
        (-174.224197059, 11.411898189, 20),
        (-155.324051364, 45.095650521, 20),
        (-99.735027626, 56.535904666, 20),
        (-91.302109797, 57.603531678, 20),
        (10.655298124, 57.126957688, 20),
        (19.062765943, 56.052210345, 20),
        (69.354299522, 59.437998327, 20),
        (76.576918629, 64.806907354, 20),
        (152.028572351, 99.202969162, 20),
        (158.324352301, 94.583069912, 20),
        (155.508210181, 63.454930376, 20),
        (156.876524055, 62.735532934, 20),
        (159.591463431, 97.848728486, 20),
        (154.738438299, 101.376924818, 20),
        (74.458181594, 65.14323147, 20),
        (69.642846878, 61.563769001, 20),
        (18.047519346, 57.680566039, 20),
        (12.0977422, 58.455285231, 20),
        (-92.732073243, 58.945285465, 20),
        (-98.684559207, 58.191686864, 20),
        (-156.950021623, 46.200097642, 20),
        (-162.638748681, 44.274485931, 20),
        (-175.617677363, 10.5, 20),
        (-163.47635635, 42.039311575, 20),
    ]]
    fillet(fillet_1_edges, radius=FILLET_1_R)

    # ﾌｨﾚｯﾄ3
    fillet_3_edges = [part.edges().sort_by_distance(p)[0] for p in [
        (-175.354101966, 4.5, 20),
        (156.329313397, 56.735532934, 20),
    ]]
    fillet(fillet_3_edges, radius=FILLET_3_R)

    # ﾌｨﾚｯﾄ4
    fillet_4_edges = [part.edges().sort_by_distance(p)[0] for p in [
        (-172.852772551, 27.036503028, 40),
        (-172.852772551, 27.036503028, 0),
        (-174.496755599, 26.76353818, 40),
        (64.982359088, 58.386614212, 40),
        (41.171934255, 56.366268849, 40),
        (37.32663542, 54.884402397, 40),
        (-156.25241115, 43.796271973, 40),
        (-158.163872737, 39.618873276, 40),
        (-156.25241115, 43.796271973, 0),
        (-158.163872737, 39.618873276, 0),
        (-172.919038538, 10.5, 0),
        (-172.919038538, 10.5, 40),
        (-169, 7.5, 40),
        (-169, 7.5, 0),
        (-92.4175483, 56.460931868, 40),
        (-94.956046603, 52.626497208, 40),
        (-92.4175483, 56.460931868, 0),
        (-94.956046603, 52.626497208, 0),
        (14.262548518, 52.115982644, 40),
        (17.711667491, 55.212376579, 40),
        (14.262548518, 52.115982644, 0),
        (17.711667491, 55.212376579, 0),
        (149.975211431, 59.735532934, 40),
        (153.943457268, 56.735532934, 40),
        (149.975211431, 59.735532934, 0),
        (153.943457268, 56.735532934, 0),
        (-157.222222844, 38.366054139, 40),
        (-157.222222844, 38.366054139, 0),
        (-127.7212524, 51.747326519, 0),
        (-127.7212524, 51.747326519, 40),
        (-94.85985575, 51.127666971, 40),
        (-94.85985575, 51.127666971, 0),
        (-40.309022297, 60.442434008, 0),
        (-40.309022297, 60.442434008, 40),
        (14.115637874, 50.62249771, 40),
        (14.115637874, 50.62249771, 0),
        (65.429568152, 56.949108434, 40),
        (65.429568152, 56.949108434, 0),
        (75.621371199, 58.547256792, 40),
        (75.621371199, 58.547256792, 0),
        (112.400183249, 85.500173809, 0),
        (112.400183249, 85.500173809, 40),
        (153.827551561, 95.076174137, 40),
        (153.827551561, 95.076174137, 0),
        (158.068245541, 78.914782698, 0),
        (158.068245541, 78.914782698, 40),
        (148.538237858, 58.985022768, 40),
        (148.538237858, 58.985022768, 0),
        (159.585920071, 79.046123951, 0),
        (159.585920071, 79.046123951, 40),
        (-166.634814433, 41.359610926, 0),
        (-161.890971039, 41.697794272, 0),
        (-128.024778685, 53.216297373, 0),
        (-98.370034264, 55.707333273, 0),
        (-40.302010998, 61.942418726, 0),
        (11.760006542, 55.973980411, 0),
        (67.692381882, 60.044588841, 0),
        (74.72769572, 59.751974852, 0),
        (111.949802025, 86.943547277, 0),
        (154.723182233, 96.279461024, 0),
        (154.13630839, 62.735532934, 0),
        (-166.307123073, 39.502792681, 0),
        (-175.18499823, 11.021553718, 0),
        (-163.196649172, 43.074160345, 0),
        (-156.21061286, 45.790321687, 0),
        (-99.199108533, 57.525374806, 0),
        (-92.067706458, 58.428226942, 0),
        (11.428570831, 57.944459992, 0),
        (18.533672833, 57.046818746, 0),
        (69.440025994, 60.742330955, 0),
        (75.303219572, 65.100715699, 0),
        (152.715168975, 100.150386551, 0),
        (159.026732407, 95.51117627, 0),
        (156.542606194, 63.17045311, 0),
        (154.13630839, 62.735532934, 40),
        (-166.307123073, 39.502792681, 40),
        (154.723182233, 96.279461024, 40),
        (111.949802025, 86.943547277, 40),
        (74.72769572, 59.751974852, 40),
        (67.692381882, 60.044588841, 40),
        (11.760006542, 55.973980411, 40),
        (-40.302010998, 61.942418726, 40),
        (-98.370034264, 55.707333273, 40),
        (-128.024778685, 53.216297373, 40),
        (-161.890971039, 41.697794272, 40),
        (-166.634814433, 41.359610926, 40),
        (-175.18499823, 11.021553718, 40),
        (-163.196649172, 43.074160345, 40),
        (-156.21061286, 45.790321687, 40),
        (-99.199108533, 57.525374806, 40),
        (-92.067706458, 58.428226942, 40),
        (11.428570831, 57.944459992, 40),
        (18.533672833, 57.046818746, 40),
        (69.440025994, 60.742330955, 40),
        (75.303219572, 65.100715699, 40),
        (152.715168975, 100.150386551, 40),
        (159.026732407, 95.51117627, 40),
        (156.542606194, 63.17045311, 40),
        (-173.768568414, 12.485677184, 40),
        (-173.768568414, 12.485677184, 0),
        (-154.322969262, 44.816153309, 40),
        (-154.322969262, 44.816153309, 0),
        (-100.544388476, 55.883817911, 40),
        (-100.544388476, 55.883817911, 0),
        (-90.355778022, 57.17371948, 40),
        (-90.355778022, 57.17371948, 0),
        (9.704989693, 56.706010853, 40),
        (9.704989693, 56.706010853, 0),
        (19.853694224, 55.435635153, 40),
        (19.853694224, 55.435635153, 0),
        (69.202538318, 58.814048447, 40),
        (69.202538318, 58.814048447, 0),
        (77.227575415, 64.793075978, 40),
        (77.227575415, 64.793075978, 0),
        (151.279758761, 98.466578224, 40),
        (64.982359088, 58.386614212, 0),
        (151.279758761, 98.466578224, 0),
        (157.829689409, 93.629137307, 40),
        (157.829689409, 93.629137307, 0),
        (155.19278095, 64.482151477, 40),
        (155.19278095, 64.482151477, 0),
        (-164.153767397, 40.733981209, 40),
        (-164.153767397, 40.733981209, 0),
        (-174.496755599, 26.76353818, 0),
        (41.171934255, 56.366268849, 0),
        (-169.714555743, 3.623565485, 0),
        (-172.968245837, 4.5, 0),
        (-174.420614591, 4.125, 0),
        (155.395826022, 56.360532934, 0),
        (-172.968245837, 4.5, 40),
        (-169.714555743, 3.623565485, 40),
        (-174.420614591, 4.125, 40),
        (155.395826022, 56.360532934, 40),
        (37.32663542, 54.884402397, 0),
    ]]
    fillet(fillet_4_edges, radius=FILLET_4_R)

    # ｽｹｯﾁ5 → ｶｯﾄ - 押し出し3 (cut, through all)
    with BuildSketch(Plane(origin=(0, 0, 0), x_dir=(-1, 0, 0), z_dir=(0, 0, -1))):
        with BuildLine():
            Line((-14.115638044, 50.622497688), (-14.667154113, 55.08857315))
            Line((-14.667154113, 55.08857315), (-15.690627539, 63.37647229))
            add(Edge.make_bspline(
                [(-15.690627539, 63.37647229), (-17.334617898, 69.982526963), (-21.972204895, 88.617765969), (39.59099728, 88.131563488), (82.896808446, 66.274983812), (138.630742778, 56.604630711), (180.262909463, 55.367215325), (199.246708061, 19.576547293), (172.250528497, -42.660651844), (85.864873433, 1.702480232), (21.148757399, 14.194306458), (-6.451973954, 42.70591731), (-14.115638044, 50.622497688)],
                knots=[0, 0, 0, 0, 0.035176098, 0.099229424, 0.264860169, 0.374719133, 0.434579012, 0.499387156, 0.583698261, 0.765783496, 0.934967064, 1, 1, 1, 1], degree=3))
        make_face()
    extrude(amount=-CUT_EXTRUDE_3_DEPTH, mode=Mode.SUBTRACT)


solid = part.part
